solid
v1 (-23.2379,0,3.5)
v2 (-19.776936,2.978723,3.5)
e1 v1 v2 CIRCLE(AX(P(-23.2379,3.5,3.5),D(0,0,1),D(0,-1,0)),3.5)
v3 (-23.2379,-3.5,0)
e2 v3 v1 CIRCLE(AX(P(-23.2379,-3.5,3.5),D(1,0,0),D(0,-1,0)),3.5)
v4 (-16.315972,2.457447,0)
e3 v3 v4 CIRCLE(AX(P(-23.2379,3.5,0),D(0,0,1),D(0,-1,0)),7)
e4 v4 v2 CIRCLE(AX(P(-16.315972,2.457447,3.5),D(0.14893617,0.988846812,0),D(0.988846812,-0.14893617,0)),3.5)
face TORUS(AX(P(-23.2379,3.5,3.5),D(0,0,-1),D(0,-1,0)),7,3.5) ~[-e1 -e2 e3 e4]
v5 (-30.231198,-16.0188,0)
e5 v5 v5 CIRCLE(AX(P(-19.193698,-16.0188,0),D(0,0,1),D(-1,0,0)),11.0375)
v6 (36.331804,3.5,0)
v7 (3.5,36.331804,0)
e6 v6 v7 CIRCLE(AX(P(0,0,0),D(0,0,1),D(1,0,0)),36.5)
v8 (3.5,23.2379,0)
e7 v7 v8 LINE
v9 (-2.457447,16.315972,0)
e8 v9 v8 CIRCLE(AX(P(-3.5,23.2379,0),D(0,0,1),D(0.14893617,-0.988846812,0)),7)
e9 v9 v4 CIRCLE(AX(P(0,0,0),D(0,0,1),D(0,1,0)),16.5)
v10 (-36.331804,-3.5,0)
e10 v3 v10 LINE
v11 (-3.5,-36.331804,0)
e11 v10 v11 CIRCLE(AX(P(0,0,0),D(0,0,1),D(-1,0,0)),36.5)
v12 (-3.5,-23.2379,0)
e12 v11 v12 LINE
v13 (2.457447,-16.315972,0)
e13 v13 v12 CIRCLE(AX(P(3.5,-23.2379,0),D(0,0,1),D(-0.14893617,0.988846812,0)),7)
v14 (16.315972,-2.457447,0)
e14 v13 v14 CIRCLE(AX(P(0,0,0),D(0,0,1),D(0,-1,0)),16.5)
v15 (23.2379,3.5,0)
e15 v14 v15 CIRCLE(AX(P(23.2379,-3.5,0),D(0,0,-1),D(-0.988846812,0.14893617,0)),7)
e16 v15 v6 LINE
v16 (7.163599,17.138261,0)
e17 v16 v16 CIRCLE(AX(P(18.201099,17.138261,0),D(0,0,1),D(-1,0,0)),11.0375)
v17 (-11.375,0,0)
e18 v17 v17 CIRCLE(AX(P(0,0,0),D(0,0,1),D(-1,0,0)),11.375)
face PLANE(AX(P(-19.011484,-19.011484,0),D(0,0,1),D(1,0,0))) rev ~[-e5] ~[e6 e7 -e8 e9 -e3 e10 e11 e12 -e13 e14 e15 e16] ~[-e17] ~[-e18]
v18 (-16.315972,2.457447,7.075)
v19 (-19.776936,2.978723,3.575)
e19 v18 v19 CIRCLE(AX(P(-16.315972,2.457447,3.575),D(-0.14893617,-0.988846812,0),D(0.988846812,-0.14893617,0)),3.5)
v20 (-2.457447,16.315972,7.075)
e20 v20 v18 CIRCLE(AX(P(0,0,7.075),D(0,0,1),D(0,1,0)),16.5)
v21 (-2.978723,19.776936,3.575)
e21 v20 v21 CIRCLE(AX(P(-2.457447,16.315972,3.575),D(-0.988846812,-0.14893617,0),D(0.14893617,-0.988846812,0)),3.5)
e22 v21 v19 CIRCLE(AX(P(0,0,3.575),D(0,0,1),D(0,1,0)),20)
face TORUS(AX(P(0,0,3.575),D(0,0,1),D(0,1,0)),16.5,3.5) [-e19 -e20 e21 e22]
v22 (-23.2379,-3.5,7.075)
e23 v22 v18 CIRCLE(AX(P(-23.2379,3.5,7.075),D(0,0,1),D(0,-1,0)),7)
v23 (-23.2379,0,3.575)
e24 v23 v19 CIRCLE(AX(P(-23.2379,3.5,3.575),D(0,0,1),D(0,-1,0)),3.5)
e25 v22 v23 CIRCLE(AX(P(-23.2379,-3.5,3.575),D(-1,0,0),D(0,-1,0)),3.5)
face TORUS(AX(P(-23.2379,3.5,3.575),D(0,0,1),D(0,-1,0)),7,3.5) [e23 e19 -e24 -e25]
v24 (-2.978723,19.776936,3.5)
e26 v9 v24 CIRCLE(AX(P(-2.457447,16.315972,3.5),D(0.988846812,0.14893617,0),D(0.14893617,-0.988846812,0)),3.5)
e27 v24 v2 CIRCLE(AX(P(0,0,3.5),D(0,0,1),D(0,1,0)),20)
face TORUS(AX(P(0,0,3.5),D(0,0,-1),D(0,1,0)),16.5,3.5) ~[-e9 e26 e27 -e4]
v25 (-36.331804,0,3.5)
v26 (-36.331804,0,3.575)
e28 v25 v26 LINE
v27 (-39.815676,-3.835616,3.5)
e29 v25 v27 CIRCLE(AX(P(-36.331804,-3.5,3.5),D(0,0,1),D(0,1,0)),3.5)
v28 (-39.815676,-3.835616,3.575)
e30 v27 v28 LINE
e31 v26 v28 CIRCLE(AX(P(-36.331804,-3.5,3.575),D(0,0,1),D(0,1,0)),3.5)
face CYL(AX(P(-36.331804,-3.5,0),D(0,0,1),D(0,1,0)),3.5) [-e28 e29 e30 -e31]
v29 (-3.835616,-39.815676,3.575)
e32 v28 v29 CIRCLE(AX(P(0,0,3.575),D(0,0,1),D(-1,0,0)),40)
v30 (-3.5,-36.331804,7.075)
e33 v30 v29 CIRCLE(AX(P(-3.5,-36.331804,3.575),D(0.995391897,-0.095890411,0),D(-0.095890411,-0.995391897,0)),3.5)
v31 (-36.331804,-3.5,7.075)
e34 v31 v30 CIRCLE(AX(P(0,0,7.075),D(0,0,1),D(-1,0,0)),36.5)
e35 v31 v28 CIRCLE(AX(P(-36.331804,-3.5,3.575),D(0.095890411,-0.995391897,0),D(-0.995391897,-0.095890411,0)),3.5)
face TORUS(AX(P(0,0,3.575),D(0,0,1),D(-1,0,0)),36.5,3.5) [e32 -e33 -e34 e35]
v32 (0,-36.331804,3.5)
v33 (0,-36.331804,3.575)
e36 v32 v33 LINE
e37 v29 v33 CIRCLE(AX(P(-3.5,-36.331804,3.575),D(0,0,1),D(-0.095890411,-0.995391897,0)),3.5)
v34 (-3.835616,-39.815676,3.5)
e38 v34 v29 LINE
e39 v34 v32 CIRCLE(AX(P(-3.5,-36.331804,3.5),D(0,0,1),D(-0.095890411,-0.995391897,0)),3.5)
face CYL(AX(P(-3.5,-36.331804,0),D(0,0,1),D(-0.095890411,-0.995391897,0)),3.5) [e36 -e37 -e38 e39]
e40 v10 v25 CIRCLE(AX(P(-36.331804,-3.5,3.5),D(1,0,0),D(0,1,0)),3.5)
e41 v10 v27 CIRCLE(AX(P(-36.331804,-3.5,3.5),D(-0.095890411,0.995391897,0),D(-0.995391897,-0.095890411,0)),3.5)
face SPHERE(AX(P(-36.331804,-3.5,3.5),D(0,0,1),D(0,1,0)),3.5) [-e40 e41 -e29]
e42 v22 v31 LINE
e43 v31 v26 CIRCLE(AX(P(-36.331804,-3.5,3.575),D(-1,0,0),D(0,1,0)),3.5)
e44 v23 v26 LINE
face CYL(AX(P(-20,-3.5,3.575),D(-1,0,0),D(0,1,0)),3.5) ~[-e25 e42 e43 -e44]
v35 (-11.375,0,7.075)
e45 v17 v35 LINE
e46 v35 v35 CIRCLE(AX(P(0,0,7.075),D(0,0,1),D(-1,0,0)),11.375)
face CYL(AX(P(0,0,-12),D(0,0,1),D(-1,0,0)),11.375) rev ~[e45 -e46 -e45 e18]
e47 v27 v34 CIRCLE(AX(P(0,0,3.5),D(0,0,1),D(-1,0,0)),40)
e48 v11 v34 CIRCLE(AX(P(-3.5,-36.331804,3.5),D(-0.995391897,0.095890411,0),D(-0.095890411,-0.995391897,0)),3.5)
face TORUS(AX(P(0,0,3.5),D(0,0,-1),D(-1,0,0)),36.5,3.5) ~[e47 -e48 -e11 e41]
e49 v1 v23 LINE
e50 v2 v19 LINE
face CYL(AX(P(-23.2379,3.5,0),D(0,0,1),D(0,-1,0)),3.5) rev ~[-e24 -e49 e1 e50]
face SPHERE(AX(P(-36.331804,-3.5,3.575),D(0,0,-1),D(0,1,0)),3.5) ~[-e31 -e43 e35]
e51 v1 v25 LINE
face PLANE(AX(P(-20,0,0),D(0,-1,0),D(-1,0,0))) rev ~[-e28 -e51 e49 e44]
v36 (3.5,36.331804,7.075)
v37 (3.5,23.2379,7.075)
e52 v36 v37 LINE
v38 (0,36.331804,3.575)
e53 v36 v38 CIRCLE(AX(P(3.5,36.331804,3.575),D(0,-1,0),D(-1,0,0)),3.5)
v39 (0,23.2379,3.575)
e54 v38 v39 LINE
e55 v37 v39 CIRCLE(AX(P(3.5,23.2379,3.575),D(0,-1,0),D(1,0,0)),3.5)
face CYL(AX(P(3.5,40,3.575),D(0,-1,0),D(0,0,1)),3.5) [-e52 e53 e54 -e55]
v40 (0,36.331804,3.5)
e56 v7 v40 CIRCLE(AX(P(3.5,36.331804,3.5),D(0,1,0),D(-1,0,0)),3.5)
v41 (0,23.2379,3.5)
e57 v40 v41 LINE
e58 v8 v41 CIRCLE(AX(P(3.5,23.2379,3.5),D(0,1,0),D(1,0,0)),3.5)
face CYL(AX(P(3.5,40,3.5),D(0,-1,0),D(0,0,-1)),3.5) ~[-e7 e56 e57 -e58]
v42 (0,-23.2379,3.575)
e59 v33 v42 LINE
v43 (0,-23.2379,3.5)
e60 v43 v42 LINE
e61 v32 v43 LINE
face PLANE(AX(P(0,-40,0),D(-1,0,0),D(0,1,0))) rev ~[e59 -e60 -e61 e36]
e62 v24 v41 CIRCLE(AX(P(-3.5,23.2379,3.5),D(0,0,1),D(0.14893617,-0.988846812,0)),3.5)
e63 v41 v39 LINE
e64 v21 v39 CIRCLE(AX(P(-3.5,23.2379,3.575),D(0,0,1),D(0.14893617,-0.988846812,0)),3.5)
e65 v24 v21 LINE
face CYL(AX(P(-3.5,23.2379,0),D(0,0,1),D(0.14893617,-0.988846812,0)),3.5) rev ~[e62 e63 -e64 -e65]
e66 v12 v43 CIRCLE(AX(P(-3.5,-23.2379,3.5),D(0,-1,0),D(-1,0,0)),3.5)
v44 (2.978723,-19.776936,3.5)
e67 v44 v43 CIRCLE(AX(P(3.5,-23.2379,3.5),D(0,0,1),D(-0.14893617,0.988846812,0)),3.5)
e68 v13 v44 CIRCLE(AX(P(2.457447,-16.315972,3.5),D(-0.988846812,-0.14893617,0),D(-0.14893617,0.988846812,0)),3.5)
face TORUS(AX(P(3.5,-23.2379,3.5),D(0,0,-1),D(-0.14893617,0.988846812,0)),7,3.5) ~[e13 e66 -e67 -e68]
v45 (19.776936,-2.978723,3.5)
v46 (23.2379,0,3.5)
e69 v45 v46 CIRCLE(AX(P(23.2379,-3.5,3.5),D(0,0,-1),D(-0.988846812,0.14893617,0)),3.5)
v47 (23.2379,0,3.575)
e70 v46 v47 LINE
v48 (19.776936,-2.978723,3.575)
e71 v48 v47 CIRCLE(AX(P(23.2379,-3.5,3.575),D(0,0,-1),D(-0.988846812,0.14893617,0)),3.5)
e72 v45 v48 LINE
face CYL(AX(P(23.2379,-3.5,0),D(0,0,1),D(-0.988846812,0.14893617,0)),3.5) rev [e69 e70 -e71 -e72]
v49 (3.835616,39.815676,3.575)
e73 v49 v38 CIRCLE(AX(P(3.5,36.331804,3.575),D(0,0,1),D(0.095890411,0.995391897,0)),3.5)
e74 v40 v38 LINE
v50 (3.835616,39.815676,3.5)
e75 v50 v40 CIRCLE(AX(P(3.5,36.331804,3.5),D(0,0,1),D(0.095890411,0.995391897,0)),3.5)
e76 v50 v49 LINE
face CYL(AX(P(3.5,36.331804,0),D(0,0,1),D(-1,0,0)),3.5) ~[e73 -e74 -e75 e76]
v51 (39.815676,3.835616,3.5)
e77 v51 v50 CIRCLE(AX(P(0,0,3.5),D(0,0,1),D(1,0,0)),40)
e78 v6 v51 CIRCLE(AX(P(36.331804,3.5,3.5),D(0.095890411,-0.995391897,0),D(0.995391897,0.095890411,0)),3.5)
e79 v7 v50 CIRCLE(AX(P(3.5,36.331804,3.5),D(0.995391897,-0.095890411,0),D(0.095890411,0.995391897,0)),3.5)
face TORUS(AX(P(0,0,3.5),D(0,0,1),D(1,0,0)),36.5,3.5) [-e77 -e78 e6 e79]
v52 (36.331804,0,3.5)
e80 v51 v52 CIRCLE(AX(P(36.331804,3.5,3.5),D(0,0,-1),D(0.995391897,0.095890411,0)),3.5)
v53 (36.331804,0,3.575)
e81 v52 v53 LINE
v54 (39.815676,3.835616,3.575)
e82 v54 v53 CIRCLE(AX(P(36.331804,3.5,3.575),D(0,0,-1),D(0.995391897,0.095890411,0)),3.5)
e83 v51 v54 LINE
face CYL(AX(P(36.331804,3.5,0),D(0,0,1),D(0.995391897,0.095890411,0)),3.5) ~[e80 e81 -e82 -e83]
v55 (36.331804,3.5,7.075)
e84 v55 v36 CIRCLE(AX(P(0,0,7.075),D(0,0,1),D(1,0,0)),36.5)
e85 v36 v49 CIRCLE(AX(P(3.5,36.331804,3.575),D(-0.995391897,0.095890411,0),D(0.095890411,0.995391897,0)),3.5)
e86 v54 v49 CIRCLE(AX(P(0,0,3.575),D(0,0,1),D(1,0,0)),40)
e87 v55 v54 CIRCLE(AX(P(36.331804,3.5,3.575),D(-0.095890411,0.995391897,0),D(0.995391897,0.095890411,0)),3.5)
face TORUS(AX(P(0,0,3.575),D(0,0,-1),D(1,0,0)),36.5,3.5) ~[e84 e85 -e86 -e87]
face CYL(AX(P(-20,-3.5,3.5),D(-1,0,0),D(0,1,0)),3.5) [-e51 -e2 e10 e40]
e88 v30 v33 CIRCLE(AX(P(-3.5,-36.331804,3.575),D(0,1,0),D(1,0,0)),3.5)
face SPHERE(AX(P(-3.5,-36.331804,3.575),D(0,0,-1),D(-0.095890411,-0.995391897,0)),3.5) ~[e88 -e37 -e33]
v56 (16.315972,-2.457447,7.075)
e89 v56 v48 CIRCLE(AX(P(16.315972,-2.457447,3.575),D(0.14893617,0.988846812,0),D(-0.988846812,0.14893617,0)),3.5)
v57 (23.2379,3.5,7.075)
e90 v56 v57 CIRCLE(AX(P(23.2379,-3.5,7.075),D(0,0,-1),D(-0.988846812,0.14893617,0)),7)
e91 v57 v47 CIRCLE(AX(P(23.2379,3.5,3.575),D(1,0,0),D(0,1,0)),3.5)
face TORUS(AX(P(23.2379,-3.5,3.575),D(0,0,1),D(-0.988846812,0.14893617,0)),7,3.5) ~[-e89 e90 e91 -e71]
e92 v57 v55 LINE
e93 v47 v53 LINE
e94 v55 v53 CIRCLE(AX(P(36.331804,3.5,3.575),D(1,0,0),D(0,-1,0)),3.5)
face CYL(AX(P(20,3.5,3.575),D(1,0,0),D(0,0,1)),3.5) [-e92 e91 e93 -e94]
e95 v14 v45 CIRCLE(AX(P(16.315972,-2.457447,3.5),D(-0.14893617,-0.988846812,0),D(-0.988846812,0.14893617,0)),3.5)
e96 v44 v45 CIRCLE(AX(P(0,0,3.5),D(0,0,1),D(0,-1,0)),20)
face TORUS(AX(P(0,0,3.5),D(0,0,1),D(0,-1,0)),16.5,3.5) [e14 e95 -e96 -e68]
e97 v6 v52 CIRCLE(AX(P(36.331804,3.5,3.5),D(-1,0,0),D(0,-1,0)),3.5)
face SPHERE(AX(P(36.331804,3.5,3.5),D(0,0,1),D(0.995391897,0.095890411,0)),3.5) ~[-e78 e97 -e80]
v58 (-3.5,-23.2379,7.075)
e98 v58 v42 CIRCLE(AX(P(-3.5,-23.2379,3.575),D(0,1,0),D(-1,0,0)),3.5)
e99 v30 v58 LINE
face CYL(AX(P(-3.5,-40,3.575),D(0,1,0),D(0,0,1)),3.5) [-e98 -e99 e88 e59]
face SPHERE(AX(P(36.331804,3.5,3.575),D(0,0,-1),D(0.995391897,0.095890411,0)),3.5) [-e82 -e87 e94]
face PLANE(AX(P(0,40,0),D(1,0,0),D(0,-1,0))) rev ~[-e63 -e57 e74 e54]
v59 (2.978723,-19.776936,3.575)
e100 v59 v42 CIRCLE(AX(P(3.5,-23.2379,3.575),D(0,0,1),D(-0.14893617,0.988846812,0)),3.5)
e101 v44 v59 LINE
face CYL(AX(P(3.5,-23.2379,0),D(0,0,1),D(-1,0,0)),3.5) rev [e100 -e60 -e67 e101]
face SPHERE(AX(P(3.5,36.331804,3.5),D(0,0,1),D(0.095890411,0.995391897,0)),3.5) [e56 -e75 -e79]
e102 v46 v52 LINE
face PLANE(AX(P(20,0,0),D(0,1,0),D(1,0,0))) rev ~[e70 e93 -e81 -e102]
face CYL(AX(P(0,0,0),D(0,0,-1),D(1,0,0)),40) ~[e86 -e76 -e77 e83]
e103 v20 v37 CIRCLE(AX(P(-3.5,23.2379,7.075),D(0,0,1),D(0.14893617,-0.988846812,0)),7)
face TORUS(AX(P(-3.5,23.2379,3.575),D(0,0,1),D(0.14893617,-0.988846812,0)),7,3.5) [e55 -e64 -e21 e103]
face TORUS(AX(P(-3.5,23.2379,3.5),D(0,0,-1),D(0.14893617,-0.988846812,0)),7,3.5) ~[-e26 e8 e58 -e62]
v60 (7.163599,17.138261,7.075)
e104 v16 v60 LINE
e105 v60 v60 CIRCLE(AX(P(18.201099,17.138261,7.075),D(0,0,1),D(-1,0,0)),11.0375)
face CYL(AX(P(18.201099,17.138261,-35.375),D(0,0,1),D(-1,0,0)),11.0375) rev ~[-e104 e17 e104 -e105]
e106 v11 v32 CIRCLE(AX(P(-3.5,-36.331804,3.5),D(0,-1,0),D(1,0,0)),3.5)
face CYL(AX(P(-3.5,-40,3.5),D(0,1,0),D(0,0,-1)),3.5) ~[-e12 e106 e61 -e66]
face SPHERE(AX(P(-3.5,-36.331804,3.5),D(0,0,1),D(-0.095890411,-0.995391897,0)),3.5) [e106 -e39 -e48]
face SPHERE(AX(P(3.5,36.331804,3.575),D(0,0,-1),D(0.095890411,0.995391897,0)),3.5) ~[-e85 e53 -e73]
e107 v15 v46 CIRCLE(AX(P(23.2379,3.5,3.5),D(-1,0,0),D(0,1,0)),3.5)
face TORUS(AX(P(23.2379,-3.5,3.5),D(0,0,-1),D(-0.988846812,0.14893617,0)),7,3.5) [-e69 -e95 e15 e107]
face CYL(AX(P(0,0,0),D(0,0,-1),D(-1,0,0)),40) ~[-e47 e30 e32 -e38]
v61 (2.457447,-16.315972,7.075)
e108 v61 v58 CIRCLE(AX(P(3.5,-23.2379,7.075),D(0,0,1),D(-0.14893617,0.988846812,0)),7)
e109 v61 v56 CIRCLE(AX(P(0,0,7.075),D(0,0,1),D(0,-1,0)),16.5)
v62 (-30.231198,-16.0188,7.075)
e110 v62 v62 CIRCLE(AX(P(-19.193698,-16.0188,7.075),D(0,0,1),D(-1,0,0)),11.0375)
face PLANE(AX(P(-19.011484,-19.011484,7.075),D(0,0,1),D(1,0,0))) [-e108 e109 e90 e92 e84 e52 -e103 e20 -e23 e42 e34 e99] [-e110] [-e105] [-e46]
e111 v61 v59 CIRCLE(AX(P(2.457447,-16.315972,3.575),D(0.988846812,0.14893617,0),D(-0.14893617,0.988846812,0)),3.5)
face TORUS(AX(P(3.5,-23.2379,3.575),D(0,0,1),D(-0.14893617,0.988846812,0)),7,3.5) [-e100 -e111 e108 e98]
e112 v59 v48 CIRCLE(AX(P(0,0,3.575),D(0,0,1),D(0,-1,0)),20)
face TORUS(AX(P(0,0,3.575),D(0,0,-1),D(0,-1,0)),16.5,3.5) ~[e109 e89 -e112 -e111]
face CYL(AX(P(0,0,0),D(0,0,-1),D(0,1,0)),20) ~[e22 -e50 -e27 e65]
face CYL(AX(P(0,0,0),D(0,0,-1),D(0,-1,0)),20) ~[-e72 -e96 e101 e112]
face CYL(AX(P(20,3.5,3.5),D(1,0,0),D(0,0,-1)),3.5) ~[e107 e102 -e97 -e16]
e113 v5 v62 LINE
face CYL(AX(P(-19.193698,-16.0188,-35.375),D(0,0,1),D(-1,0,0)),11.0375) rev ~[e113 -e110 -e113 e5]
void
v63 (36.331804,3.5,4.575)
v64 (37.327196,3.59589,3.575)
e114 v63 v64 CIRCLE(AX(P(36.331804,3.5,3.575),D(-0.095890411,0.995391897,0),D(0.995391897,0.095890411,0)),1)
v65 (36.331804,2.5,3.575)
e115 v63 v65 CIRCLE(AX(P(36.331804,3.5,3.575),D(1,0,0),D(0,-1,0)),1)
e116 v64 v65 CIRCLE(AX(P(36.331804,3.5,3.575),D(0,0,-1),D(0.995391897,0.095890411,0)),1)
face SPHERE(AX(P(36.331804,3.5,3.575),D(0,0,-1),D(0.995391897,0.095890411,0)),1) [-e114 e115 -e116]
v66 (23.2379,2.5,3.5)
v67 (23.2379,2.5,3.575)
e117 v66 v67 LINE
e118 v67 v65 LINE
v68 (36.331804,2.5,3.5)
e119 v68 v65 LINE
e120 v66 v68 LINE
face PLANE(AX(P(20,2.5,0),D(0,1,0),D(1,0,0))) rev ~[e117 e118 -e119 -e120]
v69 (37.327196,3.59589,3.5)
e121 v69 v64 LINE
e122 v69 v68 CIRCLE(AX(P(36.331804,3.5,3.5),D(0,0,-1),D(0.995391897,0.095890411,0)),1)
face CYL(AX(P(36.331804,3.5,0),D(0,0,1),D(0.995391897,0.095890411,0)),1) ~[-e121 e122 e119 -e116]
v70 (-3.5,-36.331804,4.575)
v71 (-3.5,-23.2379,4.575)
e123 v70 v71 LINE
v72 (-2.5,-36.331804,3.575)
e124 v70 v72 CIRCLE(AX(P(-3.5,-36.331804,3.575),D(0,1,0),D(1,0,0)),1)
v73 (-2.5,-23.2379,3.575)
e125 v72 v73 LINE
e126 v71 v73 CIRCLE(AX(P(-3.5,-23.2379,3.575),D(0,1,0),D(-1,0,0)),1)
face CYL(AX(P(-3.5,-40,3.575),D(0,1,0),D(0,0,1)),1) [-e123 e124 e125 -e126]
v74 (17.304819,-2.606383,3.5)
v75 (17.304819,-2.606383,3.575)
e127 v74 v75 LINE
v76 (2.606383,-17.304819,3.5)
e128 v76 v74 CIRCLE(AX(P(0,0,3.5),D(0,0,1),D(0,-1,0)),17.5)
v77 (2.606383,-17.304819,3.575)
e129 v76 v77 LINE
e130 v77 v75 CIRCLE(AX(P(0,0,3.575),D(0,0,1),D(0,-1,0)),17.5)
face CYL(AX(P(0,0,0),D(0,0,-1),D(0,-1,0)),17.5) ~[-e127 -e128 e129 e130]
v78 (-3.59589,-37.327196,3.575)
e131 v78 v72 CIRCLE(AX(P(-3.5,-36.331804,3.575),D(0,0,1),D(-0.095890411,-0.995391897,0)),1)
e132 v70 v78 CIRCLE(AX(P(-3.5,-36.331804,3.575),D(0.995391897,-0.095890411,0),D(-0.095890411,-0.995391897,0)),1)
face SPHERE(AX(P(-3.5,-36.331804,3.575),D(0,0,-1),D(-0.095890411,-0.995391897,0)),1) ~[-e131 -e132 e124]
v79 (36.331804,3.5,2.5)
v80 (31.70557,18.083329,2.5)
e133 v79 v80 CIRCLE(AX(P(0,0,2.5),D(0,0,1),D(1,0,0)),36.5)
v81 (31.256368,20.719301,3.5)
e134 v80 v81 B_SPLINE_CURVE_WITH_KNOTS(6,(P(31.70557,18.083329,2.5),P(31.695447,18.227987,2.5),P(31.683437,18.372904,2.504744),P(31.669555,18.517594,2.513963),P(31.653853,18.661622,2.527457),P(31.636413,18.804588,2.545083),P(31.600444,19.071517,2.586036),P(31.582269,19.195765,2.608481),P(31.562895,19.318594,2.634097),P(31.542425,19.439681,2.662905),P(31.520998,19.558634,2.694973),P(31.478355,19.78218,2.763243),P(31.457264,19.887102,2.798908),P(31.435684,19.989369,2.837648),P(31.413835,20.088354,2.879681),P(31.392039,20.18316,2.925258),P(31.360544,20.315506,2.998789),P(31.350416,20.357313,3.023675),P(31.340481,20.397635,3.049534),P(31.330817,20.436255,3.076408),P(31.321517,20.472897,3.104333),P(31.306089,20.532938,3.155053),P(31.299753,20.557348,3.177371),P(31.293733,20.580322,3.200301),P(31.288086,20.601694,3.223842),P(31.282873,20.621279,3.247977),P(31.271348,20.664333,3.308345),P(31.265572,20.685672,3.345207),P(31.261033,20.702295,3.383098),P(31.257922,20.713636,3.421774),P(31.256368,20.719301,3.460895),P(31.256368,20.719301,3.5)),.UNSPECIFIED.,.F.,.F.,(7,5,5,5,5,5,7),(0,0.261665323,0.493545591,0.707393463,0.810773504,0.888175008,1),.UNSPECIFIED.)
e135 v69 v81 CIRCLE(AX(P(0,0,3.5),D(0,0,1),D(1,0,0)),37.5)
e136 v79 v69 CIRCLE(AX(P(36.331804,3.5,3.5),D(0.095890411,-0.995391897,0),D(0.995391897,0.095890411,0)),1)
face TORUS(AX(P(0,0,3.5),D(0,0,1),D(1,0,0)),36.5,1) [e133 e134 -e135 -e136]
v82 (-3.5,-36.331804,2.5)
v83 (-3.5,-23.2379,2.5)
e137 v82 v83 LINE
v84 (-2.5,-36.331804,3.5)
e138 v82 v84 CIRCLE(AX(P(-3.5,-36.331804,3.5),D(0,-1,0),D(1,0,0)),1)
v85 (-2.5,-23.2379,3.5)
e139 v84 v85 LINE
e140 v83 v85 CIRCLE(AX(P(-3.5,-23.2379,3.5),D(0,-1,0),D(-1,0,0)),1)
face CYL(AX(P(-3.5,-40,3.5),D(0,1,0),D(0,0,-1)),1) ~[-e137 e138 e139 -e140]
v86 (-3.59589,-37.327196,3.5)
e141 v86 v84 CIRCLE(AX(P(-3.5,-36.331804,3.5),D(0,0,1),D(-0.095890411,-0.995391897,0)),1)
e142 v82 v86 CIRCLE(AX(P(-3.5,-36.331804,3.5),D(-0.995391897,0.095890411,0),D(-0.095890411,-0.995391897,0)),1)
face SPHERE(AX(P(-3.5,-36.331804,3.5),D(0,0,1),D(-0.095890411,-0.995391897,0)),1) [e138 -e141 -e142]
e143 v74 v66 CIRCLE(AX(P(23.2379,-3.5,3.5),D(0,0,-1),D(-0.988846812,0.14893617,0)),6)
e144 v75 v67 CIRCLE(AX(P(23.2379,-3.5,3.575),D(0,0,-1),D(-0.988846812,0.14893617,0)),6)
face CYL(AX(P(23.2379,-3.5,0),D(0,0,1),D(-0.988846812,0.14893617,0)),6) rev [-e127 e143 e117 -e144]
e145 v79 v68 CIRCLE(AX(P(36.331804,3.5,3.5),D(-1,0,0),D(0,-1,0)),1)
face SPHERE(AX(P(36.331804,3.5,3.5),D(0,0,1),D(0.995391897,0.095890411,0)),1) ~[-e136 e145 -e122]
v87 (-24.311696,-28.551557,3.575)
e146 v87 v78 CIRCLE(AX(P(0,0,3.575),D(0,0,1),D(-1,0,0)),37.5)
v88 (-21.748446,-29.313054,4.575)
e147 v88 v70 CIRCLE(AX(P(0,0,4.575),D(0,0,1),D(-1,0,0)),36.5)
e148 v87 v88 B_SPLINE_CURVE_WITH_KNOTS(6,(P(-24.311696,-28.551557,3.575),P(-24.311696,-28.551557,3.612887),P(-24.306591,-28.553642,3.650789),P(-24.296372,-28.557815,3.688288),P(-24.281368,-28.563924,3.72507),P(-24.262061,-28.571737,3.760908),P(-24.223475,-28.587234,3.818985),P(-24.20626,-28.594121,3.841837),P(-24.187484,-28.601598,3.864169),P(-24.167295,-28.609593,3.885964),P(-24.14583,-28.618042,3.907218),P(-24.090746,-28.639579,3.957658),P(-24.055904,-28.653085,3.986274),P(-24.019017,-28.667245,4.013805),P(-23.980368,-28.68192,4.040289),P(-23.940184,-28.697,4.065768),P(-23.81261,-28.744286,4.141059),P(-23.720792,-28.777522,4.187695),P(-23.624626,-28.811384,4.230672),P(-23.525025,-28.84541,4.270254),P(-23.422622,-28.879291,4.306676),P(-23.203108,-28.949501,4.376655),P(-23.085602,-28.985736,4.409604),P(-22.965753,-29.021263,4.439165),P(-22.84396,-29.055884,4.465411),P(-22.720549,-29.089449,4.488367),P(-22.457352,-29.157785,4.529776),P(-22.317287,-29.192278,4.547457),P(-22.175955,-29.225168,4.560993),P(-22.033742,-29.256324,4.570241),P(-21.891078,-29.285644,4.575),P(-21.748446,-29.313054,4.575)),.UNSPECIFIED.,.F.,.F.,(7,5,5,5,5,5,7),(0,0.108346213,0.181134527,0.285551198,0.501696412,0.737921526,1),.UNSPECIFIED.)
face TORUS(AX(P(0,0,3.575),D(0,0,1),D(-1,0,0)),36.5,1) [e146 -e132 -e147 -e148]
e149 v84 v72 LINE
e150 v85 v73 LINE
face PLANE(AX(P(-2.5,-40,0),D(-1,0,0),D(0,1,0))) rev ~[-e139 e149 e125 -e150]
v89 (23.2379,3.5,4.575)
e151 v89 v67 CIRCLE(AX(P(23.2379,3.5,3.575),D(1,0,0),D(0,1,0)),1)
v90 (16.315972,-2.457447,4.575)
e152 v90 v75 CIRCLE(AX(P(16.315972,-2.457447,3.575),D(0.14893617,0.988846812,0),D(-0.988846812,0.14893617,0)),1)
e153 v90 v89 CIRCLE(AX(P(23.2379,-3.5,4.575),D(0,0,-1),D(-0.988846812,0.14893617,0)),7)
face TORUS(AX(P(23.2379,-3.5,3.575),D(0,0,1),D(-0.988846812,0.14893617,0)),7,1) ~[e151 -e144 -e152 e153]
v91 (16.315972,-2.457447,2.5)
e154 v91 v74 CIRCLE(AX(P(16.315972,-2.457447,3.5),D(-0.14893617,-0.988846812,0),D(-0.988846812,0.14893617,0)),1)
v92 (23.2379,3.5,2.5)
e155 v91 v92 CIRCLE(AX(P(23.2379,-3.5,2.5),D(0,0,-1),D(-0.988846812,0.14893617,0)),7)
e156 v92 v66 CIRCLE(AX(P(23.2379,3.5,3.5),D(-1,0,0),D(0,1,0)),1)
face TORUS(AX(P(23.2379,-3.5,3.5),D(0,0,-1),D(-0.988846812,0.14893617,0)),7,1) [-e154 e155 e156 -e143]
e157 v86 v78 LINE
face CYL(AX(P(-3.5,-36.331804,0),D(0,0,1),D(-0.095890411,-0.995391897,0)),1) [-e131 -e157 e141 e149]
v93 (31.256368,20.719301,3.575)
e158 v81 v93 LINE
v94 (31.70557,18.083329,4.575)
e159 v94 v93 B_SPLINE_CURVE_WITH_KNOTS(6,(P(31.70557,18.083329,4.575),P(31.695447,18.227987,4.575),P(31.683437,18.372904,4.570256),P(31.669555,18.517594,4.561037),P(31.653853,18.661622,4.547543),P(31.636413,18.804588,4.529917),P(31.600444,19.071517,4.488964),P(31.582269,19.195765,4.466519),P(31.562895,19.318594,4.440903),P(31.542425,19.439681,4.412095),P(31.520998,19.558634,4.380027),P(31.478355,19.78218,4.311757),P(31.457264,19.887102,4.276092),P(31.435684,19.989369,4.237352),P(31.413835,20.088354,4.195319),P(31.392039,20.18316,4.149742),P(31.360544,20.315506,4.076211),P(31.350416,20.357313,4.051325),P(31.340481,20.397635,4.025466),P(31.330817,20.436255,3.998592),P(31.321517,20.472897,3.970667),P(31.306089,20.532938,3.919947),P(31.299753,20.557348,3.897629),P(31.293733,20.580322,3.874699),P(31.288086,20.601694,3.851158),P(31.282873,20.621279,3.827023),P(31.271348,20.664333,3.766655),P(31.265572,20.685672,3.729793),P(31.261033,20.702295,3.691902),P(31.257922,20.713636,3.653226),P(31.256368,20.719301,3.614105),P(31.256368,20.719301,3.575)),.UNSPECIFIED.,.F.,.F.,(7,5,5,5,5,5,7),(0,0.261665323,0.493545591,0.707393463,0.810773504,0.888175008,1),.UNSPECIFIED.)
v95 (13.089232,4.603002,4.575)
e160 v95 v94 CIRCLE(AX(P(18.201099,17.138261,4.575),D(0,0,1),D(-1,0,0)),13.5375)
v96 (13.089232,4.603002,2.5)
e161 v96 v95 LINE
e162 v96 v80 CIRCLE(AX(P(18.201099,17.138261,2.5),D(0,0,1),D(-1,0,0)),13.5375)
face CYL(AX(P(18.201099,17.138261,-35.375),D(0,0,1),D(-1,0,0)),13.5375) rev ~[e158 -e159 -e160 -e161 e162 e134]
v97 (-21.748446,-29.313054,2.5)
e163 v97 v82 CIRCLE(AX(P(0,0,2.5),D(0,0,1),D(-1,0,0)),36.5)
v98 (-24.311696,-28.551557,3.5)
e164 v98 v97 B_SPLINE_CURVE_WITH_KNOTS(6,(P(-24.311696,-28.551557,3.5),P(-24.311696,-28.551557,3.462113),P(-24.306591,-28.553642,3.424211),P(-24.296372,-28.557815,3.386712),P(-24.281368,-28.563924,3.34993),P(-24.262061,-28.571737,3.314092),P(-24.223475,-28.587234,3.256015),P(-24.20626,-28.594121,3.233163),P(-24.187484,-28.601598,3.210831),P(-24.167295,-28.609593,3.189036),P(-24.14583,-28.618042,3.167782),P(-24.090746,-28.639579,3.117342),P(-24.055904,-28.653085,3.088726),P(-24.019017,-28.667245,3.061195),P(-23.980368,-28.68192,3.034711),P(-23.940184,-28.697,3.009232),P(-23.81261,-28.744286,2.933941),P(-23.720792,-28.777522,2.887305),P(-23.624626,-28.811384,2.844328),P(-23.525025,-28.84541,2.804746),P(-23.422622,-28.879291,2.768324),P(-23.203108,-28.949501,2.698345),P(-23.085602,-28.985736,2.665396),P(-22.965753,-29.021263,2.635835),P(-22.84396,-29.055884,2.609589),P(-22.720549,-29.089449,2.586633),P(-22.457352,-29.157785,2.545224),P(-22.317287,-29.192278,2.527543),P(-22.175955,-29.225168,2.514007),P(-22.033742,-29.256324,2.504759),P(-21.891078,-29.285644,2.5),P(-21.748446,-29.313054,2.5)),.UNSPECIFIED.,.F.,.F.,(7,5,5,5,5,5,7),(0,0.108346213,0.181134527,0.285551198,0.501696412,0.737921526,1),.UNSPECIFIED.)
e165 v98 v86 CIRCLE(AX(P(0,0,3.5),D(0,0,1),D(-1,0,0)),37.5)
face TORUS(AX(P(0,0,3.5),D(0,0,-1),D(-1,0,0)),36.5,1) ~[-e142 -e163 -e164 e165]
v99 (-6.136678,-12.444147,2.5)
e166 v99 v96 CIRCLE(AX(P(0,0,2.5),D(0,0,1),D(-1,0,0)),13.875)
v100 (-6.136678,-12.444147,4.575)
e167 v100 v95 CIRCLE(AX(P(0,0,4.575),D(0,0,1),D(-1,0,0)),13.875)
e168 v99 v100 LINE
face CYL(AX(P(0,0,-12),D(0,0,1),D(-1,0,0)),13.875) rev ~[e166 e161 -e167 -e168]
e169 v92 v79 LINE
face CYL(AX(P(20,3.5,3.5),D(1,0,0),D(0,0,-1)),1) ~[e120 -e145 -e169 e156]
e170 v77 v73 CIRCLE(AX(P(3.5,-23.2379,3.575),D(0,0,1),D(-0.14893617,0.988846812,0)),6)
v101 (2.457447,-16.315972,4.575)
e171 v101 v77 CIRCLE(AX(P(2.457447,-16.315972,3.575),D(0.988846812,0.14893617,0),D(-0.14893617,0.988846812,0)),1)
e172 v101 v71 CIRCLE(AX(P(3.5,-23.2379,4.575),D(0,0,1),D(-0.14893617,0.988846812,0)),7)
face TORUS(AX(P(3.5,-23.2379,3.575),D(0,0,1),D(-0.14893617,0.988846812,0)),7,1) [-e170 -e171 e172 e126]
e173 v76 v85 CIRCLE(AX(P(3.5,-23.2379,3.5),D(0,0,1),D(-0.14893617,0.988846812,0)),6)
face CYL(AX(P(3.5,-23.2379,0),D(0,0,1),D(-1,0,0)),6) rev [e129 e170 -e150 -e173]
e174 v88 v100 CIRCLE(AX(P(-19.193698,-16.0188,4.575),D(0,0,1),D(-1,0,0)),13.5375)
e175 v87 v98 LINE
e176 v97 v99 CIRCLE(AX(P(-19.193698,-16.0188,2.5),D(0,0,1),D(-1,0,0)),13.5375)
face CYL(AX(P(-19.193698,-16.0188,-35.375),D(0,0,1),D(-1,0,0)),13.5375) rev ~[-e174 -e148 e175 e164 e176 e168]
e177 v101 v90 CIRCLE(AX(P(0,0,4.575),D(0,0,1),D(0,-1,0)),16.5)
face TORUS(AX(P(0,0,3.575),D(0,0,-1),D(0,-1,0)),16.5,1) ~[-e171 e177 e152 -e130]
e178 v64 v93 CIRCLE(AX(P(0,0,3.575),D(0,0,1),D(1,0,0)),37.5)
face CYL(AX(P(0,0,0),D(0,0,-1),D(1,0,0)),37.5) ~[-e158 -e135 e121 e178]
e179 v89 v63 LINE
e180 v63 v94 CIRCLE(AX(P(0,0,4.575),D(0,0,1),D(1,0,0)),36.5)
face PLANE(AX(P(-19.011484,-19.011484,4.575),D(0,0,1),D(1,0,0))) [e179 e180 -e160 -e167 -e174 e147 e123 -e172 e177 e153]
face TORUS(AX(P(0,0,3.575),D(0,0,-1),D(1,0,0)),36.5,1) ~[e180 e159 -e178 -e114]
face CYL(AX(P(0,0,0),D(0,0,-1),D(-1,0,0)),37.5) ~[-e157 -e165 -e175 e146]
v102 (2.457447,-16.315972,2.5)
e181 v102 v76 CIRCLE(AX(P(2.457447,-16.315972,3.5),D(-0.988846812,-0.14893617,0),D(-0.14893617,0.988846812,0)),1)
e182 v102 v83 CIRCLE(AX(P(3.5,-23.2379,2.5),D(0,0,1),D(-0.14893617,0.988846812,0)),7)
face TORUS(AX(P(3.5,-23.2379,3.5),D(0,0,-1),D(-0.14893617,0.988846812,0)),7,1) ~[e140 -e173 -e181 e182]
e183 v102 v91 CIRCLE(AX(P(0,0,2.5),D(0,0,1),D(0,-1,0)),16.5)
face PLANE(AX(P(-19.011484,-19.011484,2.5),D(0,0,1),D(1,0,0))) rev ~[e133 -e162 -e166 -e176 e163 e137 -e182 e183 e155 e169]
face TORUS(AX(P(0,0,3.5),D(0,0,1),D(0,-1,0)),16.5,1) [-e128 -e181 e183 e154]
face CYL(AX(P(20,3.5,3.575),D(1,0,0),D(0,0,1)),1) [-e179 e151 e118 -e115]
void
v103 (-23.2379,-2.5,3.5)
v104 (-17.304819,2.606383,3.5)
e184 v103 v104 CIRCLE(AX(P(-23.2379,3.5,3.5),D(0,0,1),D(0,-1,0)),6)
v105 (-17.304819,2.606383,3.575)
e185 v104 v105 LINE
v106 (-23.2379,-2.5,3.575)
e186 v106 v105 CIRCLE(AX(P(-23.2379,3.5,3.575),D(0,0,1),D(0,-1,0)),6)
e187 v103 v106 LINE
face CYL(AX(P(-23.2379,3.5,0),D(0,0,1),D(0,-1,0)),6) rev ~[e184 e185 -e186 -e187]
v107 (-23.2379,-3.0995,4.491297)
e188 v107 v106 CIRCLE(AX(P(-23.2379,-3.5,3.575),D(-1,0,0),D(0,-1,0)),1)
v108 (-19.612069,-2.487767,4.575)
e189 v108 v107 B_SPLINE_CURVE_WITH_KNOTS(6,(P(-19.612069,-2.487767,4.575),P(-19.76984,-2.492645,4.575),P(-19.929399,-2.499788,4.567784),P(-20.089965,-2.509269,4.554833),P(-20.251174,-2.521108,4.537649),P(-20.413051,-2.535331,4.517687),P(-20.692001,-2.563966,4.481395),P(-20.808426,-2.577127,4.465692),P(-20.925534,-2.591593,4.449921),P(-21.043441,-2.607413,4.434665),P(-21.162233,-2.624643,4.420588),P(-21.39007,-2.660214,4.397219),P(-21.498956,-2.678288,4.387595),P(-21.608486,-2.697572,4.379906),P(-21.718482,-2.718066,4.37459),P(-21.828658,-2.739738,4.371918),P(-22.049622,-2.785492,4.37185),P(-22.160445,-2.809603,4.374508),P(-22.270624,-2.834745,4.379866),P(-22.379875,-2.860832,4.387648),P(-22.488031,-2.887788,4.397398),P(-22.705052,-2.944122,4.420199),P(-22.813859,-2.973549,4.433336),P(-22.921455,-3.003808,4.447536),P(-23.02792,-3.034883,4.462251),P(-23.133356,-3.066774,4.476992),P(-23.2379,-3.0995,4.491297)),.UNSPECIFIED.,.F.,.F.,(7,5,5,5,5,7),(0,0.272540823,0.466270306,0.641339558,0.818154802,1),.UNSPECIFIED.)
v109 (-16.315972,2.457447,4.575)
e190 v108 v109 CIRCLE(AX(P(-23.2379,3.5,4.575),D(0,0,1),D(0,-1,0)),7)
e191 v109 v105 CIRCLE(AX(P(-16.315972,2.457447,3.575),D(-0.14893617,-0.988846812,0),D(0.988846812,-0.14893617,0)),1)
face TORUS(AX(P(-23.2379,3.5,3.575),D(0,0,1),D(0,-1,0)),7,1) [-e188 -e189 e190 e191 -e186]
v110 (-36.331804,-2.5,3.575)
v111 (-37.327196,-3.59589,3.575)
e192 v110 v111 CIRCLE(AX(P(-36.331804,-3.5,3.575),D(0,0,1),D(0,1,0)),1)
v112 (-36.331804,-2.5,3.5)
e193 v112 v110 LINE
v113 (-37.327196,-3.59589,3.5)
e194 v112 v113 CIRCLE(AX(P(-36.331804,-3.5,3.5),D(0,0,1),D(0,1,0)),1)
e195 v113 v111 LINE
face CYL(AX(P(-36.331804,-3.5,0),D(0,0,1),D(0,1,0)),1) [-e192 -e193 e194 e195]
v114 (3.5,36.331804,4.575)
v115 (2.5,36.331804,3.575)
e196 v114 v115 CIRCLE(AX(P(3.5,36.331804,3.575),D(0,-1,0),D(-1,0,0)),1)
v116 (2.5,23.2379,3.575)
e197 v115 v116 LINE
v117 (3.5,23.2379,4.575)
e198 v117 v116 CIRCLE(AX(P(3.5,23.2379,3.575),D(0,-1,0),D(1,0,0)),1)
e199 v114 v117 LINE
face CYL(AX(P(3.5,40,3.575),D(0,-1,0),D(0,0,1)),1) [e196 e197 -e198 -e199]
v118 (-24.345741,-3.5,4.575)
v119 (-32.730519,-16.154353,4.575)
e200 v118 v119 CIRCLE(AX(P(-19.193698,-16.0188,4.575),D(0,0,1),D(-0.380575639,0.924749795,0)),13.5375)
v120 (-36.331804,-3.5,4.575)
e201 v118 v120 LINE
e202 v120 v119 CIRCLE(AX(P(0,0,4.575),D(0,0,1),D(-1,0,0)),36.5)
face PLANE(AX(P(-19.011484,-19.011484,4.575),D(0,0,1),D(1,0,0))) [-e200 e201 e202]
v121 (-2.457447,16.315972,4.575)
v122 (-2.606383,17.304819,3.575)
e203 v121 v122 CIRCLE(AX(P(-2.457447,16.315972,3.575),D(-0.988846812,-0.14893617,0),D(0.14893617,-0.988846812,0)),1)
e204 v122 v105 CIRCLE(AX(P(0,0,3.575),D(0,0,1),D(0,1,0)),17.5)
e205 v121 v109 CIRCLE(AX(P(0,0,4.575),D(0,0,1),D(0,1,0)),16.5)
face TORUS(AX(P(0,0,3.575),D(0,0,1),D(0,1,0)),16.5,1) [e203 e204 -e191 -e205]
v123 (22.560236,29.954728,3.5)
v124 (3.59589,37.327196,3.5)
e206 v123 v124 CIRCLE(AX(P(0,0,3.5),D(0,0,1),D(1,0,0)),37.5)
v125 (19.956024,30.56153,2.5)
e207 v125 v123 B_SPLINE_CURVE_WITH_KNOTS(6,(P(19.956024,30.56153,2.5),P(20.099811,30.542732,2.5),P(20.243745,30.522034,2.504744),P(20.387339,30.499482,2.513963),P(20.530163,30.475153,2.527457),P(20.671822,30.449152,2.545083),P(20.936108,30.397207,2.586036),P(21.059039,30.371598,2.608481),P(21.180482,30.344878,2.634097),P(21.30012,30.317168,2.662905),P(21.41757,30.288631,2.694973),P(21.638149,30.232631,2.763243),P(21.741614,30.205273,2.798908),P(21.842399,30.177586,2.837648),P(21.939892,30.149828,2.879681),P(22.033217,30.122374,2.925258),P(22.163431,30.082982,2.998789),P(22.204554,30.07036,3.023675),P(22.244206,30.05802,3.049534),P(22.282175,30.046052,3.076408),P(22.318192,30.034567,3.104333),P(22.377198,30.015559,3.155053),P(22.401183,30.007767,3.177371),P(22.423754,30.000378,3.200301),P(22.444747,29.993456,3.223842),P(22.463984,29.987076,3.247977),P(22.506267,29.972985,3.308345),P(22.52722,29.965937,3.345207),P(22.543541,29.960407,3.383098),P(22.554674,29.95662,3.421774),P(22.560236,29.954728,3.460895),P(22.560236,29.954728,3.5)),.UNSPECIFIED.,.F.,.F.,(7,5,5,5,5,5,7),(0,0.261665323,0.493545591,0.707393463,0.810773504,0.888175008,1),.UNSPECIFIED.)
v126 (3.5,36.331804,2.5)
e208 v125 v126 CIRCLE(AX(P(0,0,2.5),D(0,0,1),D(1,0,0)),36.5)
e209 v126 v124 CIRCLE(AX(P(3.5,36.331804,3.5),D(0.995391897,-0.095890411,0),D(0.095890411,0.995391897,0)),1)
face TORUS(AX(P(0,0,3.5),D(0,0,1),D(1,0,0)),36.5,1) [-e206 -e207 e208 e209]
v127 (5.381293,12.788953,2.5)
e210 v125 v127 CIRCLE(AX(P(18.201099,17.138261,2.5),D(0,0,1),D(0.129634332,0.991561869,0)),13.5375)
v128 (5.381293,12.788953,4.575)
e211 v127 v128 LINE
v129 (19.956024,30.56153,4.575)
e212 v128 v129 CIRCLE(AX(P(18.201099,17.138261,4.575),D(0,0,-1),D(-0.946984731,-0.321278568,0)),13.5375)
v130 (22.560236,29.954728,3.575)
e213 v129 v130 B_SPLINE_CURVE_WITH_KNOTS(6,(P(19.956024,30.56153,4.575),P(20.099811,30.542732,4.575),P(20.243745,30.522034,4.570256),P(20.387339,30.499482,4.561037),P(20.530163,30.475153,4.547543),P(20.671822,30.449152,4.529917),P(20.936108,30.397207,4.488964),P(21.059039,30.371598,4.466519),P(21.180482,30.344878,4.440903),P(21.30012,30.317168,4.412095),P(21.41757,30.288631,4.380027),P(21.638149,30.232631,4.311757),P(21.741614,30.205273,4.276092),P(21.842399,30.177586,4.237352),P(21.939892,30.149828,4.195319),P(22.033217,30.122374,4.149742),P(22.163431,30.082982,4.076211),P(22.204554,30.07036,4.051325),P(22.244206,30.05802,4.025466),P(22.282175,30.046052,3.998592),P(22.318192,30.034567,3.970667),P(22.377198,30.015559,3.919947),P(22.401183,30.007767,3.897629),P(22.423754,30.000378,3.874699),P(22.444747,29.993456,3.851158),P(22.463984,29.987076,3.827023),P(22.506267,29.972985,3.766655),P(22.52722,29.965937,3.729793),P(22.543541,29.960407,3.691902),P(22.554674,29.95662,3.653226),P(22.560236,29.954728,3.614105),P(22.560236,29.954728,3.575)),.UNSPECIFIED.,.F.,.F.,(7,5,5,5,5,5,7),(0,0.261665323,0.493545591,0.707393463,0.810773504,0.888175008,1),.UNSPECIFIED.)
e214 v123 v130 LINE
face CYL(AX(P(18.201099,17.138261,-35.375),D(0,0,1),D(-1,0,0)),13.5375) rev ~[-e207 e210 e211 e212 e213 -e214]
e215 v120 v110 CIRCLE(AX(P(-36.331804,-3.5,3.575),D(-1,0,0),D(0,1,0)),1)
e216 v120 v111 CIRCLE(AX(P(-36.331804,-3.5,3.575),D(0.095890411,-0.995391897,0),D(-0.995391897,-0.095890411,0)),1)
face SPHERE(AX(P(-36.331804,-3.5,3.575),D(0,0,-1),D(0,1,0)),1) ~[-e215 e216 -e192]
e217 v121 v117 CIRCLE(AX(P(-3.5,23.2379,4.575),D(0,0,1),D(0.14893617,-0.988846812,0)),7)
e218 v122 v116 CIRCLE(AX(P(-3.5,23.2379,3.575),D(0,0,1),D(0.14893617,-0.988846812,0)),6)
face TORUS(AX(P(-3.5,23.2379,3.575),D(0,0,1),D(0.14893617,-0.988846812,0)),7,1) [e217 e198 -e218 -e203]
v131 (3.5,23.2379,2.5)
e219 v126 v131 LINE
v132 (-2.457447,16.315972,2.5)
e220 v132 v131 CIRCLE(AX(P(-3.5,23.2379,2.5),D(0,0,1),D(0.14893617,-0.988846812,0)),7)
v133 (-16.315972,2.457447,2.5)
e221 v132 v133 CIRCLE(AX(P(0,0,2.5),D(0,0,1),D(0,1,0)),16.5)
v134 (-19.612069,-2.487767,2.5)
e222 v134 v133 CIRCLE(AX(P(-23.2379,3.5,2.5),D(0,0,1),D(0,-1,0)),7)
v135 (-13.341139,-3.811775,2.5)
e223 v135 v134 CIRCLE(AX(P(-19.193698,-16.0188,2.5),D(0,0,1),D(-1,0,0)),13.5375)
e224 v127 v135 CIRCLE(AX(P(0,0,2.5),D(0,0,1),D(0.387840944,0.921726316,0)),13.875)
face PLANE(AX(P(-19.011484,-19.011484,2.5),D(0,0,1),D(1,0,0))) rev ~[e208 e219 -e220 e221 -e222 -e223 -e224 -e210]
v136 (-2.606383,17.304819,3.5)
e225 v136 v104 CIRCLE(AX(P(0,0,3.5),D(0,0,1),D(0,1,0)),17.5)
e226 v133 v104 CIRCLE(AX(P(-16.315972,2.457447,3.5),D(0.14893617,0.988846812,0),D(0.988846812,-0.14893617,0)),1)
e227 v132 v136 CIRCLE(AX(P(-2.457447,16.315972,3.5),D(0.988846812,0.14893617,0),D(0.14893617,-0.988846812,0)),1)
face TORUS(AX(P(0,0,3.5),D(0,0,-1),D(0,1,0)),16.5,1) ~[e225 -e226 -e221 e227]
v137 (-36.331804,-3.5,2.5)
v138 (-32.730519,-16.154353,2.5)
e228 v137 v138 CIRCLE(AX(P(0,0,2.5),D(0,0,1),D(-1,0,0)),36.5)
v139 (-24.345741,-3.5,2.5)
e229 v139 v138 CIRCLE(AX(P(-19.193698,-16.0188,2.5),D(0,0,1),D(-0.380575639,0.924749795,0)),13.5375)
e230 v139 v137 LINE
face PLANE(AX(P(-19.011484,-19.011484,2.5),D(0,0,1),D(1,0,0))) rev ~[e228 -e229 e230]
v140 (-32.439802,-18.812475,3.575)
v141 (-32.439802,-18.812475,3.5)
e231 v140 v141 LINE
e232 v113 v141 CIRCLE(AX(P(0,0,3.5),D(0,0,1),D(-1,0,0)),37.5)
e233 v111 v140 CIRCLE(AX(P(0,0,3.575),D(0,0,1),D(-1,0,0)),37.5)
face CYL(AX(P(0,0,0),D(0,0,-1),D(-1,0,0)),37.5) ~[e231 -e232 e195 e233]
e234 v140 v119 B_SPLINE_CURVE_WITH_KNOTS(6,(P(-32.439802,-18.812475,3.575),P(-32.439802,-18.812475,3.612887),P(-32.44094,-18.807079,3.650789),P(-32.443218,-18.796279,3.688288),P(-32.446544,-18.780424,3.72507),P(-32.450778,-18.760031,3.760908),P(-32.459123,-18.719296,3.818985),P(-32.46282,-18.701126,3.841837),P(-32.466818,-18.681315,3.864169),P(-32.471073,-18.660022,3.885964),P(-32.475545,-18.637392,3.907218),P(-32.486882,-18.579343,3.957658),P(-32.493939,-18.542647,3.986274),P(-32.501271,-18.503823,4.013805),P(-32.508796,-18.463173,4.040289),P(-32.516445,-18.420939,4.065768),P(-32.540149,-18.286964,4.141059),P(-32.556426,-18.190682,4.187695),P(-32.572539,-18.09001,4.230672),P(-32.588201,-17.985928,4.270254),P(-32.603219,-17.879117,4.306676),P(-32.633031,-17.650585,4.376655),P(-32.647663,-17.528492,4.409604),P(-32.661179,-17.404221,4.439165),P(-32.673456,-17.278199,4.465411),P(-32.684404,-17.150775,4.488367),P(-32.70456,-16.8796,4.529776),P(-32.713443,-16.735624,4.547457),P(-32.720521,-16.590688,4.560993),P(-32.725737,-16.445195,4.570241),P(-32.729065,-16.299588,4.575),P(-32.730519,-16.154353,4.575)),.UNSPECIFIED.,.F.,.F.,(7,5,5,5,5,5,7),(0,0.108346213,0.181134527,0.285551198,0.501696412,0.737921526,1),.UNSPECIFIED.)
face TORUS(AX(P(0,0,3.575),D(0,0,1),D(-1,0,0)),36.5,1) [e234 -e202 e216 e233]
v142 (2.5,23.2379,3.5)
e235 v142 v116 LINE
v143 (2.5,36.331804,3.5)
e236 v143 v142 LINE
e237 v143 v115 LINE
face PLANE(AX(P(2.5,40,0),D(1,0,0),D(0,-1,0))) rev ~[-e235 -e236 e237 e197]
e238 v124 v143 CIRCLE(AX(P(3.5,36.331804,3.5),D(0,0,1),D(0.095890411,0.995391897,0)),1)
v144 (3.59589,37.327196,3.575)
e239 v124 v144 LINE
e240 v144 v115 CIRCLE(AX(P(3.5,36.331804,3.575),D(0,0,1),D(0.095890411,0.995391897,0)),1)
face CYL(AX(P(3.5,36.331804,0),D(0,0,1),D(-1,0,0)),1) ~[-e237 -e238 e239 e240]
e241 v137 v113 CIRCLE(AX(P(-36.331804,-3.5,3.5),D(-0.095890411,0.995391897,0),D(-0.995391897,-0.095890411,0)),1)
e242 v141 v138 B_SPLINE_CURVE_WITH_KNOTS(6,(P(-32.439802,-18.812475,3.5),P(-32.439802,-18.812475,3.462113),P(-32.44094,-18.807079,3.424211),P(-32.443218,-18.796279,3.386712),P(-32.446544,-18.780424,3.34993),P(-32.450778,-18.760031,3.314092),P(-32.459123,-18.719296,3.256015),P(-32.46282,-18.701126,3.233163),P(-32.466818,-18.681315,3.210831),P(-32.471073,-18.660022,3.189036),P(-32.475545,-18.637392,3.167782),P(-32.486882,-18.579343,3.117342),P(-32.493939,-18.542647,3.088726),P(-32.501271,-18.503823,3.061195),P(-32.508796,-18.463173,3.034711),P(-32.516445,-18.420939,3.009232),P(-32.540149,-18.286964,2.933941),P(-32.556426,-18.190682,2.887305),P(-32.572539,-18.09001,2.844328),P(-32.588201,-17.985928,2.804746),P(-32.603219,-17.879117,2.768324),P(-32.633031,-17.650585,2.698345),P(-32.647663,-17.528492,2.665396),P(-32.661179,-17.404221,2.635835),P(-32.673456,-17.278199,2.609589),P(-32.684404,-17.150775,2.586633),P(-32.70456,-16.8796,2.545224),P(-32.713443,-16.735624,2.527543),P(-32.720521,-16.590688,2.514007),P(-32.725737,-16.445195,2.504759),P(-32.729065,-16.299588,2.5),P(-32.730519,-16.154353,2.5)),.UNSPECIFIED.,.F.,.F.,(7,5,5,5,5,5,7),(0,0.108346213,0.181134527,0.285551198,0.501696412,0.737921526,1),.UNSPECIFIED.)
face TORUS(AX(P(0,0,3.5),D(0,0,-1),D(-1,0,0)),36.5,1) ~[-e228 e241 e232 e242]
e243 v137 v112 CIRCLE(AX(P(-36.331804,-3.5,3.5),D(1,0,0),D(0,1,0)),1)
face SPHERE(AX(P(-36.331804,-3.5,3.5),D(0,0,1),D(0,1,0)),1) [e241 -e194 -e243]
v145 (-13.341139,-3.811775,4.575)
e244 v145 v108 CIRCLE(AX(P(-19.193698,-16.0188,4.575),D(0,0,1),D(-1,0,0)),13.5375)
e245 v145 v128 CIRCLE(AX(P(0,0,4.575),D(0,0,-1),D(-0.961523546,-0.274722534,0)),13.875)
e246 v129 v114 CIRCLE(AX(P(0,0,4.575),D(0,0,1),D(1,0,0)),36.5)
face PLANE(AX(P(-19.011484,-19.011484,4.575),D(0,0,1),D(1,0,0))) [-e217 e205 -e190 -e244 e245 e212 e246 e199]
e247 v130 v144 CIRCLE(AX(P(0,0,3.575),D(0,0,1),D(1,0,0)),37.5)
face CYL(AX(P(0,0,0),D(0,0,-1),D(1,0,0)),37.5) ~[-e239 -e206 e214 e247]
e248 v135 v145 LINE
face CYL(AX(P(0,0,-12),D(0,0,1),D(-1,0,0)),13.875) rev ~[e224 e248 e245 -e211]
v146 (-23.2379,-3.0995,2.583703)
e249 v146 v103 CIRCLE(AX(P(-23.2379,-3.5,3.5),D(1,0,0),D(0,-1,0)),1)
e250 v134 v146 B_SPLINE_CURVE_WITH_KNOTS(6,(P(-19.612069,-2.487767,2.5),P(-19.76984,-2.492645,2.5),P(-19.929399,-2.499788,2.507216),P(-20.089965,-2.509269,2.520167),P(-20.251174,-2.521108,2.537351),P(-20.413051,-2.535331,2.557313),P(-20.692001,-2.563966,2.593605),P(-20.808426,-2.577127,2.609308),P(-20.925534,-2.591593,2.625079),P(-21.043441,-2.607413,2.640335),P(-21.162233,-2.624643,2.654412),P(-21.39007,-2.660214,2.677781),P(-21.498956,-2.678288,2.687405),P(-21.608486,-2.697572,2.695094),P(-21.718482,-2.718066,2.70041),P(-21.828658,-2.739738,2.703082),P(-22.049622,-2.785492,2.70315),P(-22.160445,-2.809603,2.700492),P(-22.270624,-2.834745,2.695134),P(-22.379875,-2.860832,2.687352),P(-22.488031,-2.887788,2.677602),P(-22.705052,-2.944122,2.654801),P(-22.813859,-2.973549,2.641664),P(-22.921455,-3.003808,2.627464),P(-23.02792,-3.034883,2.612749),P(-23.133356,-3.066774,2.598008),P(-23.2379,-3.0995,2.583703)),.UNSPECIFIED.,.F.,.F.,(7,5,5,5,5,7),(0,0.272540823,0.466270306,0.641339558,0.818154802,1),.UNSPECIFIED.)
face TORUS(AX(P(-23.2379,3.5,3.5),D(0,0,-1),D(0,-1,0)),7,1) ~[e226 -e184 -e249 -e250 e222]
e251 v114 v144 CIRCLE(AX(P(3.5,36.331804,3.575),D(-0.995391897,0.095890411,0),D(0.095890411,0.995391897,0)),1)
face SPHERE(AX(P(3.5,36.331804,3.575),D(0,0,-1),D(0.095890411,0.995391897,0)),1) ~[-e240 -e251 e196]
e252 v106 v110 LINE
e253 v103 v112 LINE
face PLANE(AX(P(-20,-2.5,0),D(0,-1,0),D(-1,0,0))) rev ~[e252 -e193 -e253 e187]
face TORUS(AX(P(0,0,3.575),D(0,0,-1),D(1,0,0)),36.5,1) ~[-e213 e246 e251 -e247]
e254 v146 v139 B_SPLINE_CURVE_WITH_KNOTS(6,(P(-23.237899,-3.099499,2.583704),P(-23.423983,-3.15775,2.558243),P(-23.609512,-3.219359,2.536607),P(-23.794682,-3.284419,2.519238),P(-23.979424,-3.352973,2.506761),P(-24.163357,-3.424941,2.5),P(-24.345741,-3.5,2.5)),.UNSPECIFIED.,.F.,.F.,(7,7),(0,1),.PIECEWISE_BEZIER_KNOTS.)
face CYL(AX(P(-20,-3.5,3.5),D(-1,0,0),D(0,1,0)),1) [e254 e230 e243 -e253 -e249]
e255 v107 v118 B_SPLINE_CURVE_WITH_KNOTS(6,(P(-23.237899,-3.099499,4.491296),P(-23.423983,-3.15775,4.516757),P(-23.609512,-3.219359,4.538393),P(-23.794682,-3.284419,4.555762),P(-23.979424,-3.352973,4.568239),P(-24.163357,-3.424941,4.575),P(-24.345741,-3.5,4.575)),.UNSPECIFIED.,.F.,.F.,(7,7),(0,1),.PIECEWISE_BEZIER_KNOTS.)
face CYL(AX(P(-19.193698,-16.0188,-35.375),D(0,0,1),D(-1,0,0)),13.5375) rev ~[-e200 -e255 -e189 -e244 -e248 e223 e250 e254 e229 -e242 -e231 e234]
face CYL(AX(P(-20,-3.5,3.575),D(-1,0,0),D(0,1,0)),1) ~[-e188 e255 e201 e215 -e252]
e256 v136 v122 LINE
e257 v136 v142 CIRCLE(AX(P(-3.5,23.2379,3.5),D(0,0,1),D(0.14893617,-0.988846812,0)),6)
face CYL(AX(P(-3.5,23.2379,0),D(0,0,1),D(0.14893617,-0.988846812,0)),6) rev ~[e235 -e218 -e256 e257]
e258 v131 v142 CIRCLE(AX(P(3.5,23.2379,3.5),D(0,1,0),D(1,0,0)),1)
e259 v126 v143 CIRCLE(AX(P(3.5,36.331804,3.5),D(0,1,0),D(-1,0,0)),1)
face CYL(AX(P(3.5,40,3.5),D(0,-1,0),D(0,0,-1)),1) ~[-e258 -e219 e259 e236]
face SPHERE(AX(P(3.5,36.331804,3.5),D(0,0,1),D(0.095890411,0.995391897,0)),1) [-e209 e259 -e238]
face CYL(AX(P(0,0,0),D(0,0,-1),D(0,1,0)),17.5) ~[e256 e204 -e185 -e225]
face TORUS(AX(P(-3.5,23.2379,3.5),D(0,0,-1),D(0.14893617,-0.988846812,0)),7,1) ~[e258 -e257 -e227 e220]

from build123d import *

# Parameters (mm, degrees)
F1_DEPTH = 7.075
F2_D     = 22.75
F2_DEPTH = 12
F2_TIP   = 6.8347895414
F3_D     = 22.075
F3_DEPTH = 35.375
F3_TIP   = 6.6319990825
F4_R     = 3.5
F5_T     = 2.5


# Not quite as in the source:
# - a shell that OpenCascade refuses in one call is made with other operations: the cavity is built on its own and cut out


with BuildPart() as f1:
    # F0 (on Top) → F1 (new body)
    with BuildSketch(Plane.XY):
        with BuildLine():
            ThreePointArc((0, -20), (-14.1421356237, -14.1421356237), (-20, 0))
            Line((-20, 0), (-40, 0))
            ThreePointArc((-40, 0), (-28.2842712475, -28.2842712475), (0, -40))
            Line((0, -40), (0, -20))
        make_face()
        with BuildLine():
            ThreePointArc((40, 0), (28.2842712475, 28.2842712475), (0, 40))
            Line((0, 40), (0, 20))
            ThreePointArc((0, 20), (14.1421356237, 14.1421356237), (20, 0))
            Line((20, 0), (40, 0))
        make_face()
        with BuildLine():
            Line((0, 0), (0, 20))
            ThreePointArc((0, 20), (-14.1421356237, 14.1421356237), (-20, 0))
            Line((-20, 0), (0, 0))
        make_face()
        with BuildLine():
            ThreePointArc((0, -20), (14.1421356237, -14.1421356237), (20, 0))
            Line((20, 0), (0, 0))
            Line((0, 0), (0, -20))
        make_face()
        with BuildLine():
            ThreePointArc((20, 0), (14.1421356237, 14.1421356237), (0, 20))
            Line((0, 20), (0, 0))
            Line((0, 0), (20, 0))
        make_face()
        with BuildLine():
            Line((0, -20), (0, 0))
            Line((0, 0), (-20, 0))
            ThreePointArc((-20, 0), (-14.1421356237, -14.1421356237), (0, -20))
        make_face()
    extrude(amount=F1_DEPTH)

    # F2
    with Locations(Plane(origin=(0, 0, 0), x_dir=(1, 0, 0), z_dir=(0, 0, -1))):
        with Locations((0, 0)):
            Hole(F2_D / 2, depth=F2_DEPTH)
            with Locations((0, 0, -(F2_DEPTH + F2_TIP / 2))):  # 118° drill point
                Cone(0, F2_D / 2, F2_TIP, mode=Mode.SUBTRACT)

    # F3
    with Locations(Plane(origin=(0, 0, 0), x_dir=(1, 0, 0), z_dir=(0, 0, -1))):
        with Locations((-19.1936978065, 16.0188003456), (18.2010988932, -17.1382612619)):
            Hole(F3_D / 2, depth=F3_DEPTH)
            with Locations((0, 0, -(F3_DEPTH + F3_TIP / 2))):  # 118° drill point
                Cone(0, F3_D / 2, F3_TIP, mode=Mode.SUBTRACT)

    # F4
    f4_edges = [f1.edges().sort_by_distance(p)[0] for p in [
        (40, 0, 3.5375),
        (0, 40, 3.5375),
        (28.284271, 28.284271, 0),
        (28.284271, 28.284271, 7.075),
        (-20, 0, 3.5375),
        (-40, 0, 3.5375),
        (-30, 0, 0),
        (-30, 0, 7.075),
        (0, 20, 3.5375),
        (-14.142136, 14.142136, 0),
        (-14.142136, 14.142136, 7.075),
        (0, -40, 3.5375),
        (-28.284271, -28.284271, 0),
        (-28.284271, -28.284271, 7.075),
        (0, -20, 3.5375),
        (20, 0, 3.5375),
        (14.142136, -14.142136, 0),
        (14.142136, -14.142136, 7.075),
        (30, 0, 0),
        (30, 0, 7.075),
        (0, -30, 0),
        (0, -30, 7.075),
        (0, 30, 0),
        (0, 30, 7.075),
    ]]
    fillet(f4_edges, radius=F4_R)

    # F5: shell of thickness 2.5, made by hand


with BuildPart() as f5_core1:
    # F5_t2: copy of F1
    add(f1.part)

    # the walls: a layer under each face that stays
    f5_faces = [f5_core1.faces().sort_by_distance(p)[0] for p in [
        (-29.7848521632, 0, 3.5375),
        (-20.9547518216, 0.8472214486, 3.5375),
        (-29.7848521632, -1.0251262658, 1.0251262658),
        (-29.7848521632, -1.0251262658, 6.0498737342),
        (-38.9226204849, -1.146774292, 3.5375),
        (-20.2860331799, 0.0702405999, 1.0251262658),
        (-20.2860331799, 0.0702405999, 6.0498737342),
        (-14.1421356237, 14.1421356237, 3.5375),
        (-31.1415464993, -10.3805154998, 0),
        (-38.1637879782, -1.8360181442, 1.0251262658),
        (-31.1415464993, -10.3805154998, 7.075),
        (-38.1637879782, -1.8360181442, 6.0498737342),
        (-28.2842712475, -28.2842712475, 3.5375),
        (-13.4172618896, 13.4172618896, 1.0251262658),
        (-13.4172618896, 13.4172618896, 6.0498737342),
        (-0.8472214486, 20.9547518216, 3.5375),
        (27.5593975133, 27.5593975133, 1.0251262658),
        (29.7848521632, 1.0251262658, 1.0251262658),
        (1.0251262658, 29.7848521632, 1.0251262658),
        (20.2860331799, -0.0702405999, 1.0251262658),
        (-0.0702405999, 20.2860331799, 1.0251262658),
        (13.4172618896, -13.4172618896, 1.0251262658),
        (0.0702405999, -20.2860331799, 1.0251262658),
        (-1.0251262658, -29.7848521632, 1.0251262658),
        (-27.5593975133, -27.5593975133, 1.0251262658),
        (-30.2311978065, -16.0188003456, 3.5375),
        (-11.375, 0, 3.5375),
        (7.1635988932, 17.1382612619, 3.5375),
        (27.5593975133, 27.5593975133, 6.0498737342),
        (29.7848521632, 1.0251262658, 6.0498737342),
        (1.0251262658, 29.7848521632, 6.0498737342),
        (20.2860331799, -0.0702405999, 6.0498737342),
        (-0.0702405999, 20.2860331799, 6.0498737342),
        (13.4172618896, -13.4172618896, 6.0498737342),
        (0.0702405999, -20.2860331799, 6.0498737342),
        (-1.0251262658, -29.7848521632, 6.0498737342),
        (-27.5593975133, -27.5593975133, 6.0498737342),
        (-1.146774292, -38.9226204849, 3.5375),
        (0, 29.7848521632, 3.5375),
        (38.1637879782, 1.8360181442, 1.0251262658),
        (28.2842712475, 28.2842712475, 3.5375),
        (1.8360181442, 38.1637879782, 1.0251262658),
        (29.7848521632, 0, 3.5375),
        (20.9547518216, -0.8472214486, 3.5375),
        (14.1421356237, -14.1421356237, 3.5375),
        (0.8472214486, -20.9547518216, 3.5375),
        (-1.8360181442, -38.1637879782, 1.0251262658),
        (0, -29.7848521632, 3.5375),
        (38.1637879782, 1.8360181442, 6.0498737342),
        (1.8360181442, 38.1637879782, 6.0498737342),
        (-1.8360181442, -38.1637879782, 6.0498737342),
        (1.146774292, 38.9226204849, 3.5375),
        (38.9226204849, 1.146774292, 3.5375),
    ]]
    thicken(f5_faces, amount=-F5_T, mode=Mode.SUBTRACT)


with BuildPart() as f1_1:
    add(f1.part)

    # what is left inside the walls is the cavity
    f5_cavity = [f5_core1.part.solids().sort_by_distance(p)[0] for p in [
        (5.117989, 27.411009, 4.55),
        (-3.598368, -16.178051, 4.55),
    ]]
    add(f5_cavity, mode=Mode.SUBTRACT)


solid = f1_1.part
